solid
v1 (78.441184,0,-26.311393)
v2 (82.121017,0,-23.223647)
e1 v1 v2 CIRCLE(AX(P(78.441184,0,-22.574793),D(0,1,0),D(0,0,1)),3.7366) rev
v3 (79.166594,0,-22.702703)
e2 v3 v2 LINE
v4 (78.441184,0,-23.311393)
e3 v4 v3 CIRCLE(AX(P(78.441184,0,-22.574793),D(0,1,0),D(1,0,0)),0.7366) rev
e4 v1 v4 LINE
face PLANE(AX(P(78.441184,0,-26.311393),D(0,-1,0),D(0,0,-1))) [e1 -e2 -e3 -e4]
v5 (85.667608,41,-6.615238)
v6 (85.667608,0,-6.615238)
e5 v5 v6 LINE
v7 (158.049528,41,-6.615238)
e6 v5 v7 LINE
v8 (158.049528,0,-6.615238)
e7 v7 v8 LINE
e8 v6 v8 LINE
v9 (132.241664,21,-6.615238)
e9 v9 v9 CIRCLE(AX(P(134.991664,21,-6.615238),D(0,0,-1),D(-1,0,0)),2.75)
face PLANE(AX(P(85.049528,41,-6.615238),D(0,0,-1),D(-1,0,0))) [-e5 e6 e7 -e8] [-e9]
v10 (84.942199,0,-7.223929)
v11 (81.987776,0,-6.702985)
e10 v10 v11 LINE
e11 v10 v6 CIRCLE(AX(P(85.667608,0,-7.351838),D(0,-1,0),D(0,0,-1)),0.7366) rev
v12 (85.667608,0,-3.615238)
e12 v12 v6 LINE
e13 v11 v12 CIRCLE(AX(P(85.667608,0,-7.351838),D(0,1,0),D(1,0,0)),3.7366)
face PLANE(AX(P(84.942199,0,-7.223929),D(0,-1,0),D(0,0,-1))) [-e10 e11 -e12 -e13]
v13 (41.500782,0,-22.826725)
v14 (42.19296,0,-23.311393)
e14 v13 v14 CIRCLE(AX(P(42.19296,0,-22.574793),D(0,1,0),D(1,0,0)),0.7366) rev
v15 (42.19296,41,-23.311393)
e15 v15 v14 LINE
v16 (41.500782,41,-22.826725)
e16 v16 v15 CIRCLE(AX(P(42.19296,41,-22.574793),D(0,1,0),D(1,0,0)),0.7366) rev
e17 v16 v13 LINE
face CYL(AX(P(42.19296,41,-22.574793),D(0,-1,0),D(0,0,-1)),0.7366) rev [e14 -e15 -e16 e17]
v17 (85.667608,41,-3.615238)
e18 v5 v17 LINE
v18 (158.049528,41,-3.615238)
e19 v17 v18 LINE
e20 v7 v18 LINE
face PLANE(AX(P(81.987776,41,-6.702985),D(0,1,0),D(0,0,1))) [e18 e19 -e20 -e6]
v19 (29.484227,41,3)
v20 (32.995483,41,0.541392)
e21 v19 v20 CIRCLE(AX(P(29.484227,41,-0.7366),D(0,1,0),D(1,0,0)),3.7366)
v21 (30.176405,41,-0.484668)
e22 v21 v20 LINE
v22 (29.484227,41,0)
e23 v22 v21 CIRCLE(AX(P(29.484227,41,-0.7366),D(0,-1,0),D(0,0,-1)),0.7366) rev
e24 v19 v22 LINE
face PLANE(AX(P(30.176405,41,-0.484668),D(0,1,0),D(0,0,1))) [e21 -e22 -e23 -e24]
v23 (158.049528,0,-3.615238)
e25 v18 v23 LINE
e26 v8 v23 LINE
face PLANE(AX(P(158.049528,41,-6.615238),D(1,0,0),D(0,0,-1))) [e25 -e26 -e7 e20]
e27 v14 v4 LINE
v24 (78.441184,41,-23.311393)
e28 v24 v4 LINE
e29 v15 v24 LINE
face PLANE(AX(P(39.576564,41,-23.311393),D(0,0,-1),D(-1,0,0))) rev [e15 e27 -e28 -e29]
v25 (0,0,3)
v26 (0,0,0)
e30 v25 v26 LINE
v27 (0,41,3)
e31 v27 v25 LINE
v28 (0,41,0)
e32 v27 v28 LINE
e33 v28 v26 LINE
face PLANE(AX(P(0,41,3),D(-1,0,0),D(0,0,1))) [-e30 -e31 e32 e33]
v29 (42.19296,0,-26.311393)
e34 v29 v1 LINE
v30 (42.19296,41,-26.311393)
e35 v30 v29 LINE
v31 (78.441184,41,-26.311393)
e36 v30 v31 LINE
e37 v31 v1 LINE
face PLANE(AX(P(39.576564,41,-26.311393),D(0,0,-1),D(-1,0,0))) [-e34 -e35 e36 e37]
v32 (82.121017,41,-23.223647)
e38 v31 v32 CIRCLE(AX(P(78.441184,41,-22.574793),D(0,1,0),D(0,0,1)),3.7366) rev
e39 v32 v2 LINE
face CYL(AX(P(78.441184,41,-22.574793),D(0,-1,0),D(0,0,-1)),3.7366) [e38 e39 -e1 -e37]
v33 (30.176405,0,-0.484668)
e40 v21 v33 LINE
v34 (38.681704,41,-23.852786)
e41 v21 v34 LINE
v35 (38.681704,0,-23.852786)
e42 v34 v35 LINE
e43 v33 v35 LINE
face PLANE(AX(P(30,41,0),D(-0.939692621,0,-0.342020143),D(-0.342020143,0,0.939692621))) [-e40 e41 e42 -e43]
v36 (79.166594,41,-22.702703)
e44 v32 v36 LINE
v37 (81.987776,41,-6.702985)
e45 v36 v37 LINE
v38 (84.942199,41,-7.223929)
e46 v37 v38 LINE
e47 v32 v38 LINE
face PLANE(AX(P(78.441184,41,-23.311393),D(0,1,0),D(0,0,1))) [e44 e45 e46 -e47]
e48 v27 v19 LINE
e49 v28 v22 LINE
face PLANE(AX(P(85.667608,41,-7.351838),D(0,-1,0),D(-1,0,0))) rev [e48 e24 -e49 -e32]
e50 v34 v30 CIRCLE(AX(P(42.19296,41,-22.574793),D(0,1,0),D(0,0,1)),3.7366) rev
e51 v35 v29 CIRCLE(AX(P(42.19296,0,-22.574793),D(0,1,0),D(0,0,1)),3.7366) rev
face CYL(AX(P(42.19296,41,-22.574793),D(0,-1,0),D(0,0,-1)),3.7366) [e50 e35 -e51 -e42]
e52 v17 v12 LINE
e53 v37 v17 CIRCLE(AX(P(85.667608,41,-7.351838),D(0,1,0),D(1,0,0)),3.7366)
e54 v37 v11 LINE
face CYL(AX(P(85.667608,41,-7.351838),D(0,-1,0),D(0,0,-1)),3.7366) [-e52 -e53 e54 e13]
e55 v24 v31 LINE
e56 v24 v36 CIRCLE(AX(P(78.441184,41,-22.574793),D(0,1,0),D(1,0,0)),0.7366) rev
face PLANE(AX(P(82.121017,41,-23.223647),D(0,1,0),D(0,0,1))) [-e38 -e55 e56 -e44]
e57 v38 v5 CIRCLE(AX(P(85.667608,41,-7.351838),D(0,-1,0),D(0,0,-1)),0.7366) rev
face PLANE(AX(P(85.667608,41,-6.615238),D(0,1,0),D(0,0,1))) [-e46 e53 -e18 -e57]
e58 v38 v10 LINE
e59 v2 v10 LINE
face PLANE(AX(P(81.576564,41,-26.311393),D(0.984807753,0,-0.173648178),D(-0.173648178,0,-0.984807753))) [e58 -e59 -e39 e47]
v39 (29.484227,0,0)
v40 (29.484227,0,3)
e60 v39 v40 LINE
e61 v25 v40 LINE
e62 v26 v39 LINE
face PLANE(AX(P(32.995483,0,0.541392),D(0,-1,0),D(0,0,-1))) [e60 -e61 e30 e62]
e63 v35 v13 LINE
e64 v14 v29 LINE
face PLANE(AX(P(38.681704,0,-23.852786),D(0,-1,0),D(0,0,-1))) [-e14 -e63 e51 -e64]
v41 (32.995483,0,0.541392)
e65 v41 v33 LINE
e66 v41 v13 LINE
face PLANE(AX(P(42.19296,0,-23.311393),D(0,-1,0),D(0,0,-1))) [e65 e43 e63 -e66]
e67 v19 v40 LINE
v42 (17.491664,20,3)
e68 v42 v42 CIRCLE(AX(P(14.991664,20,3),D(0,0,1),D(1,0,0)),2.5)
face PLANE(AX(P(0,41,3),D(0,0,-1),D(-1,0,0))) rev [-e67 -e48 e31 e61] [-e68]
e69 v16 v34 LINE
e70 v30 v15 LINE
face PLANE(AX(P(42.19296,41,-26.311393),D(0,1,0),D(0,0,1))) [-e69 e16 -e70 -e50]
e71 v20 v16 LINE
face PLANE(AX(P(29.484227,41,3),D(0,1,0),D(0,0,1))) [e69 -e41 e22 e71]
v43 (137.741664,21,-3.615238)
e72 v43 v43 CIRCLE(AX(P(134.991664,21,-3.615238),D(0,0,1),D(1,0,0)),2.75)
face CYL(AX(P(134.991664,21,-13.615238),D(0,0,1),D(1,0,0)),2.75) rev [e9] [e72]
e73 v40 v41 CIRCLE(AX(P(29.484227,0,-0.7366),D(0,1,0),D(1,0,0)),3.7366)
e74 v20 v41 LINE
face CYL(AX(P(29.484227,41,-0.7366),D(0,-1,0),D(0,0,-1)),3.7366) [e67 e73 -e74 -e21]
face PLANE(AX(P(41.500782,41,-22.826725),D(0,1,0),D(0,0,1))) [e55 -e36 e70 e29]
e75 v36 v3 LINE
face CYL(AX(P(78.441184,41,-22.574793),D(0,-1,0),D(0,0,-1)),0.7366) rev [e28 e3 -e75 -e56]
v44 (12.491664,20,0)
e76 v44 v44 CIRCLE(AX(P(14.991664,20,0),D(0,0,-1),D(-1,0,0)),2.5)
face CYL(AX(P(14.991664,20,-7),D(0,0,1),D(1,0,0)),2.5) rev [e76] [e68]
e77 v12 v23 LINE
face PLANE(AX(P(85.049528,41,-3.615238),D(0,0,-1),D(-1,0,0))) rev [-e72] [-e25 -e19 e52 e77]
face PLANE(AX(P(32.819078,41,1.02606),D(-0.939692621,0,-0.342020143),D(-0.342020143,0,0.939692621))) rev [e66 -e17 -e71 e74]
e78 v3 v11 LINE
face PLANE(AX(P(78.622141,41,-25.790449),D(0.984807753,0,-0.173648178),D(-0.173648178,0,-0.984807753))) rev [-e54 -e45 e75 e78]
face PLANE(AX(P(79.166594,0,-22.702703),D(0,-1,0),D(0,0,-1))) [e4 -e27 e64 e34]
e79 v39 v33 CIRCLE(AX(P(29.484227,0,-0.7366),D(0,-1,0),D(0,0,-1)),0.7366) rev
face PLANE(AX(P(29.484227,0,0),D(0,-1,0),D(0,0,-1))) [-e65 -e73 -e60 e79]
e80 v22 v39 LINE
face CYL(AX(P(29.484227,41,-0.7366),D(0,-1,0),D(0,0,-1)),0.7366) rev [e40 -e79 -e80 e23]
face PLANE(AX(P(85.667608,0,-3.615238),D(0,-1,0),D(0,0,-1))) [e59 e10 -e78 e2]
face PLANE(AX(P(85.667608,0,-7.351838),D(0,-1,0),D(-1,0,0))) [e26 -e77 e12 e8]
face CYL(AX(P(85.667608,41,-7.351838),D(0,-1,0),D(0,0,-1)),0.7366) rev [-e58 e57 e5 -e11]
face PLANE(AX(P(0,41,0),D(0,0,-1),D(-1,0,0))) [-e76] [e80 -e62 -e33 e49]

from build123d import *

# Parameters (mm, degrees)
BASE_FLANGE1_DEPTH = 41
SKETCH2_R          = 2.5
CUT_EXTRUDE1_DEPTH = 10
SKETCH3_R          = 2.75
SKETCH3_R_2        = 2.5
CUT_EXTRUDE2_DEPTH = 10


# Sheet-metal steps are written as plain solids
with BuildPart() as part:
    # Sketch1 → Base-Flange1 (new body)
    with BuildSketch(Plane(origin=(0, 0, 0), x_dir=(1, 0, 0), z_dir=(0, 1, 0))):
        with BuildLine():
            Line((0, 0), (29.484227127, 0))
            ThreePointArc((29.484227127, 0), (29.90672353, 0.133212604), (30.176404712, 0.484667962))
            Line((30.176404712, 0.484667962), (38.681704054, 23.85278585))
            ThreePointArc((38.681704054, 23.85278585), (40.049733788, 25.635636911), (42.1929595, 26.311393382))
            Line((42.1929595, 26.311393382), (78.441184331, 26.311393382))
            ThreePointArc((78.441184331, 26.311393382), (80.843024514, 25.437195048), (82.121016981, 23.223647163))
            Line((82.121016981, 23.223647163), (84.942198964, 7.223929074))
            ThreePointArc((84.942198964, 7.223929074), (85.194131001, 6.787569985), (85.667608355, 6.615238322))
            Line((85.667608355, 6.615238322), (158.049527566, 6.615238322))
            Line((158.049527566, 6.615238322), (158.049527566, 3.615238322))
            Line((158.049527566, 3.615238322), (85.667608355, 3.615238322))
            ThreePointArc((85.667608355, 3.615238322), (83.265768172, 4.489436656), (81.987775705, 6.702984541))
            Line((81.987775705, 6.702984541), (79.166593722, 22.70270263))
            ThreePointArc((79.166593722, 22.70270263), (78.914661685, 23.139061719), (78.441184331, 23.311393382))
            Line((78.441184331, 23.311393382), (42.1929595, 23.311393382))
            ThreePointArc((42.1929595, 23.311393382), (41.770463097, 23.178180778), (41.500781916, 22.82672542))
            Line((41.500781916, 22.82672542), (32.995482574, -0.541392468))
            ThreePointArc((32.995482574, -0.541392468), (31.627452839, -2.324243529), (29.484227127, -3))
            Line((29.484227127, -3), (0, -3))
            Line((0, -3), (0, 0))
        make_face()
    extrude(amount=BASE_FLANGE1_DEPTH)

    # Sketch2 → Cut-Extrude1 (cut)
    with BuildSketch(Plane.XY.offset(3)):
        with Locations((14.991664351, 20)):
            Circle(SKETCH2_R)
    extrude(amount=-CUT_EXTRUDE1_DEPTH, mode=Mode.SUBTRACT)

    # Sketch3 → Cut-Extrude2 (cut)
    with BuildSketch(Plane.XY.offset(-3.615238322)):
        with Locations((134.991664351, 21)):
            Circle(SKETCH3_R)
        with Locations((14.991664351, 20)):
            Circle(SKETCH3_R_2)
    extrude(amount=-CUT_EXTRUDE2_DEPTH, mode=Mode.SUBTRACT)


solid = part.part
